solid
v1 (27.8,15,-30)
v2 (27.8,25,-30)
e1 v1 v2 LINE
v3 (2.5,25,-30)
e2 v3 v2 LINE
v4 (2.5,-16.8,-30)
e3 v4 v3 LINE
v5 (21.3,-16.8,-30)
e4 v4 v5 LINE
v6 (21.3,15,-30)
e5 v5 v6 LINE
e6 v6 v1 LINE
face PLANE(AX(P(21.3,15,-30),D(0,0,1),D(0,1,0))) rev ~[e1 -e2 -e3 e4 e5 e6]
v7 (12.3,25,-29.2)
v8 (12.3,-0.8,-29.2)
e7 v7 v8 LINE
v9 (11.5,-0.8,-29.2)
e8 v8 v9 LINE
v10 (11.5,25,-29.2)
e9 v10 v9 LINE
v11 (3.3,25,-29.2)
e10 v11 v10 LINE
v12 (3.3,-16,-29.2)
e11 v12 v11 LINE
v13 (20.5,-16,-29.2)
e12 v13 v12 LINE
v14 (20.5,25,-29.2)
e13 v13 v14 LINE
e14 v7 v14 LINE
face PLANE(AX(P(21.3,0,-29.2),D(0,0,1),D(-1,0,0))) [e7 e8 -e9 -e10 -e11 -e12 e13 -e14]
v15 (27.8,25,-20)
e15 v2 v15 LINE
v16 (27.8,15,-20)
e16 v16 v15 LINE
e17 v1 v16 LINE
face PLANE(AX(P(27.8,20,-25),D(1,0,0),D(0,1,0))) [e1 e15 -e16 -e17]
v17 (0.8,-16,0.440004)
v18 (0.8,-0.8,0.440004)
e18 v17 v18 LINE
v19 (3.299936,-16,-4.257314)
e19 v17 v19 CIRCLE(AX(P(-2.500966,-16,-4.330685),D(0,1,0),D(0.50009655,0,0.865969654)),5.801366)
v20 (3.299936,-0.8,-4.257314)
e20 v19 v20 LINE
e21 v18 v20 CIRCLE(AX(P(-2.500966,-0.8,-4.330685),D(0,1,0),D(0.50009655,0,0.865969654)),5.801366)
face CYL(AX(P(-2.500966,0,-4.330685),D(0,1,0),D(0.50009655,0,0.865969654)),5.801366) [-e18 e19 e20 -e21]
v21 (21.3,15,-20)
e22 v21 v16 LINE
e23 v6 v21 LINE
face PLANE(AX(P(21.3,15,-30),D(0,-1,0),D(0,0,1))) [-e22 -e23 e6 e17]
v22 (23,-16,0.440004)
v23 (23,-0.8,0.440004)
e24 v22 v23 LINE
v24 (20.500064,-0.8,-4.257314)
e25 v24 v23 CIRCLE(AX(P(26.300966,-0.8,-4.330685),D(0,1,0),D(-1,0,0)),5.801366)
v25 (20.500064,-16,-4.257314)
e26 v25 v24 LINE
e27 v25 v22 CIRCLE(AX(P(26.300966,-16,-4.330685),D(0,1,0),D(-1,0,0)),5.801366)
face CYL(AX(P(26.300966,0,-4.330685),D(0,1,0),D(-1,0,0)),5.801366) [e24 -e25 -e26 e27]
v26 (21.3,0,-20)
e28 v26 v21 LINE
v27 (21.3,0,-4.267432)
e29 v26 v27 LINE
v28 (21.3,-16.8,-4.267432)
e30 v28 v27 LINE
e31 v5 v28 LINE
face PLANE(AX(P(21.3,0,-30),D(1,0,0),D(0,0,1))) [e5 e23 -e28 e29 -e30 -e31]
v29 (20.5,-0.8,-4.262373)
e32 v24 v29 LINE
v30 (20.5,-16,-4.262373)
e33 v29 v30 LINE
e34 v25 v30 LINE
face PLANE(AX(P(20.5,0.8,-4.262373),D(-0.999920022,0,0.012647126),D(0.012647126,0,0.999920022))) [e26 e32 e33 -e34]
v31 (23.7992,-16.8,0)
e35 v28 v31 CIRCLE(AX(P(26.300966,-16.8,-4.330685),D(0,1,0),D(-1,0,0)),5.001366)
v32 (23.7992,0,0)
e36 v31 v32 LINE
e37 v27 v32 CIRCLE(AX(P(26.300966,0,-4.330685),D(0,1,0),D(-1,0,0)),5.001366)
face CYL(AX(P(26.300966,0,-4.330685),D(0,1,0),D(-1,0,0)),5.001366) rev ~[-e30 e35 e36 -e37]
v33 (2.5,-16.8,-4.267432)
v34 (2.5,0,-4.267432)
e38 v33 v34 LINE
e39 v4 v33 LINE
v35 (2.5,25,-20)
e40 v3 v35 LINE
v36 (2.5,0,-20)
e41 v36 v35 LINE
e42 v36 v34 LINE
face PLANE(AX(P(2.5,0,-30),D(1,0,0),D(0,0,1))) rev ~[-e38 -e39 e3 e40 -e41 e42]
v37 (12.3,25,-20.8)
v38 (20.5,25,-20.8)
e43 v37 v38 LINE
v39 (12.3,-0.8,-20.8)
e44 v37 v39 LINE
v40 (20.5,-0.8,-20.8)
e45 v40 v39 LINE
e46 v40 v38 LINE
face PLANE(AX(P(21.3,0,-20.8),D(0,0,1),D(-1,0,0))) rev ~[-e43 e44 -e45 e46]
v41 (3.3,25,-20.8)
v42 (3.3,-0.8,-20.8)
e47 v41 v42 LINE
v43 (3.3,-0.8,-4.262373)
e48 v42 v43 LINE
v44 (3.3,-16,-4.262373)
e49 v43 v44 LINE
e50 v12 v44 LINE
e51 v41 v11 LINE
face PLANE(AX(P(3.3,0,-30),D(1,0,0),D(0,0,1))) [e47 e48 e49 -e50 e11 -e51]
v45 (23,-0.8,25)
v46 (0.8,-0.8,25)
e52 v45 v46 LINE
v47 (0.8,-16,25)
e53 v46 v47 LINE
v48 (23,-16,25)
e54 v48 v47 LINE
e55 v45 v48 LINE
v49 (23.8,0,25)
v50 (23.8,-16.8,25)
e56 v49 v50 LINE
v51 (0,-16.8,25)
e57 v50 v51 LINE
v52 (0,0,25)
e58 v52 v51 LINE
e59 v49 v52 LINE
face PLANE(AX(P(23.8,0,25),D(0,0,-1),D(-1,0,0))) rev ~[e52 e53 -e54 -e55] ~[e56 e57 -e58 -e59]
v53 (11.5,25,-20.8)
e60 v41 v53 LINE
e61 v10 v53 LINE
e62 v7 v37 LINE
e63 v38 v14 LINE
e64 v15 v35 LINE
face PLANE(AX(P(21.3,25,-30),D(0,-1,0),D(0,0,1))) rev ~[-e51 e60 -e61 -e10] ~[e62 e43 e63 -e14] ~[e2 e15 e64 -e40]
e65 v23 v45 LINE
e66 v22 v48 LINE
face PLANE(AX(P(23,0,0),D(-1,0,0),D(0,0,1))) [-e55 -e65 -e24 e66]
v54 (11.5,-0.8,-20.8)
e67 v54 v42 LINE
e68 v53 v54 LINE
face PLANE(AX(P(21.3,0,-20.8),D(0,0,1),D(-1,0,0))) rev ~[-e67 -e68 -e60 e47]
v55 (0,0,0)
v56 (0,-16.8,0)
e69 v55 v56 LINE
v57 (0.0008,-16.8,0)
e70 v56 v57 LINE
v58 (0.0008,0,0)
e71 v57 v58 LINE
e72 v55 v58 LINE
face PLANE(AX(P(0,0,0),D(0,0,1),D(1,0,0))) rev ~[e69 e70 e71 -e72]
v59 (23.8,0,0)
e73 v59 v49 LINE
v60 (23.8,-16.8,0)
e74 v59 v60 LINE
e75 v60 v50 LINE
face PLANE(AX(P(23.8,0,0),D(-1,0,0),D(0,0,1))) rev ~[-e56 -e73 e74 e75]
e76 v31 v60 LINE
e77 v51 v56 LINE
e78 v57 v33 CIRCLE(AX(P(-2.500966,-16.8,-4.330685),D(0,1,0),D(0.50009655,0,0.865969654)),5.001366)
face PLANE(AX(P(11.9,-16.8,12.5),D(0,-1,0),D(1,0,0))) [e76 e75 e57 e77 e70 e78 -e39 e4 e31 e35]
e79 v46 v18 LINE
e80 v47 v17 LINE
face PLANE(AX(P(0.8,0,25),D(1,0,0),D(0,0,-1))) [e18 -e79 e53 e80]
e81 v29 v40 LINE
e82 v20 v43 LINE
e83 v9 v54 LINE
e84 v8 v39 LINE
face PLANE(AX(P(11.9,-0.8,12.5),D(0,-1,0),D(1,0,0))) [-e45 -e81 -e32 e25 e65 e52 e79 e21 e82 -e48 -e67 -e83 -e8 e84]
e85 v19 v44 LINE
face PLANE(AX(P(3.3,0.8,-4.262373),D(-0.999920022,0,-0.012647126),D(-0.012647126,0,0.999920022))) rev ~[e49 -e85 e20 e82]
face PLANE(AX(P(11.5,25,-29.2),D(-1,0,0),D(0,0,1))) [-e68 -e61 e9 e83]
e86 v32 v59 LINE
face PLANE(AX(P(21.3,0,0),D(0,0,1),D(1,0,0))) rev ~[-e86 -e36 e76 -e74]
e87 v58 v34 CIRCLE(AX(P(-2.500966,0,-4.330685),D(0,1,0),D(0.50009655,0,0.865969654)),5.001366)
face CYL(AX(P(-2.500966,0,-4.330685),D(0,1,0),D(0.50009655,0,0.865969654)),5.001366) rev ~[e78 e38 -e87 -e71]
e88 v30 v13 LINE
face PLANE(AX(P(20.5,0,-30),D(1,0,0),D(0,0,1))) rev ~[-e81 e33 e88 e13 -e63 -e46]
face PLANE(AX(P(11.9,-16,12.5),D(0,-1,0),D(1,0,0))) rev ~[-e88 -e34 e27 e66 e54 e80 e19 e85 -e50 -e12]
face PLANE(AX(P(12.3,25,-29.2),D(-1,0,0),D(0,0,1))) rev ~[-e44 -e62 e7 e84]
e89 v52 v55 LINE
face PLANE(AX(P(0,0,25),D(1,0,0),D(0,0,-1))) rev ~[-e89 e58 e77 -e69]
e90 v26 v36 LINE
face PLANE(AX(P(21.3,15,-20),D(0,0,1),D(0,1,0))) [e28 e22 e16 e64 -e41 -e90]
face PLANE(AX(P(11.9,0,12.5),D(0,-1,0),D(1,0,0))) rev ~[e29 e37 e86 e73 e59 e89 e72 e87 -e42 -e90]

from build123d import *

# Parameters (mm, degrees)
F2_W        = 18.8
F2_H        = 30
F3_DEPTH    = 16.8
F4_T1_DEPTH = 16.8
F5_T        = 0.8
F5_T3_DEPTH = 18.4
F6_W        = 18.8
F6_H        = 10
F7_DEPTH    = 25
F8_T        = -0.8
F9_DEPTH    = 0.8
F10_W       = 0.8
F10_H       = 8.4
F11_DEPTH   = 25.8
F12_W       = 10
F12_H       = 10
F13_DEPTH   = 6.5


# Not quite as in the source:
# - a fillet or chamfer that OpenCascade refuses, or shapes differently, is made with other operations: its cross-section is extruded or revolved along the edge and cut away or added
# - a shell that OpenCascade refuses in one call is made with other operations: the cavity is built on its own and cut out


with BuildPart() as f3:
    # F2 (on Front) → F3 (new body)
    with BuildSketch(Plane.XZ):
        Polygon((23.8, 25), (0, 25), (0, 0), (2.5, 0), (21.3, 0), (23.8, 0), align=None)
        with Locations((11.9, -15)):
            Rectangle(F2_W, F2_H)
    extrude(amount=F3_DEPTH)

    # F4: fillet of radius 5 on 2 edges, made by hand

    # F4_s2 → F4_t1 (join)
    with BuildSketch(Plane.XZ):
        with BuildLine():
            ThreePointArc((0.0002000386, 0.0003463879), (1.8304834454, -1.8302431314), (2.5004, -4.3306845218))
            Line((2.5004, -4.3306845218), (3.0005365685, -4.3306845218))
            ThreePointArc((3.0005365685, -4.3306845218), (3.0001365685, -2.1653422609), (3.0001365685, 0))
            Line((3.0001365685, 0), (2.5, 0.5001365685))
            ThreePointArc((2.5, 0.5001365685), (1.2501000193, 0.5001365685), (0.250316611, 0.4334494788))
            Line((0.250316611, 0.4334494788), (0.0002000386, 0.0003463879))
        make_face()
        with BuildLine():
            ThreePointArc((21.2996, -4.3306845218), (21.9695165546, -1.8302431314), (23.7997999614, 0.0003463879))
            Line((23.7997999614, 0.0003463879), (23.549683389, 0.4334494788))
            ThreePointArc((23.549683389, 0.4334494788), (22.5498999807, 0.5001365685), (21.3, 0.5001365685))
            Line((21.3, 0.5001365685), (20.7998634315, 0))
            ThreePointArc((20.7998634315, 0), (20.7998634315, -2.1653422609), (20.7994634315, -4.3306845218))
            Line((20.7994634315, -4.3306845218), (21.2996, -4.3306845218))
        make_face()
    extrude(amount=F4_T1_DEPTH)

    # F5: shell of thickness 0.8, made by hand


with BuildPart() as f5_core1:
    # F5_t2: copy of F3
    add(f3.part)

    # the walls: a layer under each face that stays
    f5_faces = [f5_core1.faces().sort_by_distance(p)[0] for p in [
        (23.8, -8.4, 12.5),
        (0, -8.4, 12.5),
        (11.9, 0, -2.5),
        (11.9, -16.8, -2.5),
        (23.7996001251, -8.4, 0),
        (0.0003998749, -8.4, 0),
        (21.3, -8.4, -17.1337157982),
        (11.9, -8.4, -30),
        (2.5, -8.4, -17.1337157982),
        (21.9852401758, -8.4, -1.8032011796),
        (1.8147598242, -8.4, -1.8032011796),
    ]]
    thicken(f5_faces, amount=-F5_T, mode=Mode.SUBTRACT)

    # F5_s4 → F5_t3 (cut)
    with BuildSketch(Plane.XZ.offset(-0.8)):
        Polygon((23.803201982, -0.0149272032), (23.7992002503, 0.8), (23.5847337286, 0.8), (23.3990270828, 0.6927203159), align=None)
        Polygon((-0.003201982, -0.0149272032), (0.0007997497, 0.8), (0.2152662714, 0.8), (0.4009729172, 0.6927203159), align=None)
        Polygon((21.3159993602, -4.2675327735), (20.5, -4.2674315965), (20.5, -4.2623725419), (20.5000639825, -4.257313892), align=None)
        Polygon((2.4840006398, -4.2675327735), (3.3, -4.2674315965), (3.3, -4.2623725419), (3.2999360175, -4.257313892), align=None)
    extrude(amount=F5_T3_DEPTH, mode=Mode.SUBTRACT)


with BuildPart() as f3_1:
    add(f3.part)

    # what is left inside the walls is the cavity
    f5_cavity = [f5_core1.part.solids().sort_by_distance(p)[0] for p in [
        (11.9, -15.992, -11.133333),
    ]]
    add(f5_cavity, mode=Mode.SUBTRACT)

    # F6 (on face) → F7 (join)
    with BuildSketch(Plane(origin=(0, 0, 0), x_dir=(-1, 0, 0), z_dir=(0, 1, 0))):
        with Locations((-11.9, -25)):
            Rectangle(F6_W, F6_H)
    extrude(amount=F7_DEPTH)

    # F8
    f8_openings = [f3_1.faces().sort_by_distance(p)[0] for p in [
        (11.9, 25, -25),
    ]]
    offset(amount=F8_T, openings=f8_openings, kind=Kind.INTERSECTION)

    # F9 (cut, through all): a face of the model
    f9_faces = [f3_1.faces().sort_by_distance(p)[0] for p in [
        (11.9, 0, -25),
    ]]
    extrude(f9_faces, amount=-F9_DEPTH, mode=Mode.SUBTRACT)

    # F10 (on face) → F11 (join, through all)
    with BuildSketch(Plane(origin=(0, 25, 0), x_dir=(-1, 0, 0), z_dir=(0, 1, 0))):
        with Locations((-11.9, -25)):
            Rectangle(F10_W, F10_H)
    extrude(amount=-F11_DEPTH)

    # F12 (on face) → F13 (join)
    with BuildSketch(Plane.YZ.offset(21.3)):
        with Locations((20, -25)):
            Rectangle(F12_W, F12_H)
    extrude(amount=F13_DEPTH)


solid = f3_1.part
